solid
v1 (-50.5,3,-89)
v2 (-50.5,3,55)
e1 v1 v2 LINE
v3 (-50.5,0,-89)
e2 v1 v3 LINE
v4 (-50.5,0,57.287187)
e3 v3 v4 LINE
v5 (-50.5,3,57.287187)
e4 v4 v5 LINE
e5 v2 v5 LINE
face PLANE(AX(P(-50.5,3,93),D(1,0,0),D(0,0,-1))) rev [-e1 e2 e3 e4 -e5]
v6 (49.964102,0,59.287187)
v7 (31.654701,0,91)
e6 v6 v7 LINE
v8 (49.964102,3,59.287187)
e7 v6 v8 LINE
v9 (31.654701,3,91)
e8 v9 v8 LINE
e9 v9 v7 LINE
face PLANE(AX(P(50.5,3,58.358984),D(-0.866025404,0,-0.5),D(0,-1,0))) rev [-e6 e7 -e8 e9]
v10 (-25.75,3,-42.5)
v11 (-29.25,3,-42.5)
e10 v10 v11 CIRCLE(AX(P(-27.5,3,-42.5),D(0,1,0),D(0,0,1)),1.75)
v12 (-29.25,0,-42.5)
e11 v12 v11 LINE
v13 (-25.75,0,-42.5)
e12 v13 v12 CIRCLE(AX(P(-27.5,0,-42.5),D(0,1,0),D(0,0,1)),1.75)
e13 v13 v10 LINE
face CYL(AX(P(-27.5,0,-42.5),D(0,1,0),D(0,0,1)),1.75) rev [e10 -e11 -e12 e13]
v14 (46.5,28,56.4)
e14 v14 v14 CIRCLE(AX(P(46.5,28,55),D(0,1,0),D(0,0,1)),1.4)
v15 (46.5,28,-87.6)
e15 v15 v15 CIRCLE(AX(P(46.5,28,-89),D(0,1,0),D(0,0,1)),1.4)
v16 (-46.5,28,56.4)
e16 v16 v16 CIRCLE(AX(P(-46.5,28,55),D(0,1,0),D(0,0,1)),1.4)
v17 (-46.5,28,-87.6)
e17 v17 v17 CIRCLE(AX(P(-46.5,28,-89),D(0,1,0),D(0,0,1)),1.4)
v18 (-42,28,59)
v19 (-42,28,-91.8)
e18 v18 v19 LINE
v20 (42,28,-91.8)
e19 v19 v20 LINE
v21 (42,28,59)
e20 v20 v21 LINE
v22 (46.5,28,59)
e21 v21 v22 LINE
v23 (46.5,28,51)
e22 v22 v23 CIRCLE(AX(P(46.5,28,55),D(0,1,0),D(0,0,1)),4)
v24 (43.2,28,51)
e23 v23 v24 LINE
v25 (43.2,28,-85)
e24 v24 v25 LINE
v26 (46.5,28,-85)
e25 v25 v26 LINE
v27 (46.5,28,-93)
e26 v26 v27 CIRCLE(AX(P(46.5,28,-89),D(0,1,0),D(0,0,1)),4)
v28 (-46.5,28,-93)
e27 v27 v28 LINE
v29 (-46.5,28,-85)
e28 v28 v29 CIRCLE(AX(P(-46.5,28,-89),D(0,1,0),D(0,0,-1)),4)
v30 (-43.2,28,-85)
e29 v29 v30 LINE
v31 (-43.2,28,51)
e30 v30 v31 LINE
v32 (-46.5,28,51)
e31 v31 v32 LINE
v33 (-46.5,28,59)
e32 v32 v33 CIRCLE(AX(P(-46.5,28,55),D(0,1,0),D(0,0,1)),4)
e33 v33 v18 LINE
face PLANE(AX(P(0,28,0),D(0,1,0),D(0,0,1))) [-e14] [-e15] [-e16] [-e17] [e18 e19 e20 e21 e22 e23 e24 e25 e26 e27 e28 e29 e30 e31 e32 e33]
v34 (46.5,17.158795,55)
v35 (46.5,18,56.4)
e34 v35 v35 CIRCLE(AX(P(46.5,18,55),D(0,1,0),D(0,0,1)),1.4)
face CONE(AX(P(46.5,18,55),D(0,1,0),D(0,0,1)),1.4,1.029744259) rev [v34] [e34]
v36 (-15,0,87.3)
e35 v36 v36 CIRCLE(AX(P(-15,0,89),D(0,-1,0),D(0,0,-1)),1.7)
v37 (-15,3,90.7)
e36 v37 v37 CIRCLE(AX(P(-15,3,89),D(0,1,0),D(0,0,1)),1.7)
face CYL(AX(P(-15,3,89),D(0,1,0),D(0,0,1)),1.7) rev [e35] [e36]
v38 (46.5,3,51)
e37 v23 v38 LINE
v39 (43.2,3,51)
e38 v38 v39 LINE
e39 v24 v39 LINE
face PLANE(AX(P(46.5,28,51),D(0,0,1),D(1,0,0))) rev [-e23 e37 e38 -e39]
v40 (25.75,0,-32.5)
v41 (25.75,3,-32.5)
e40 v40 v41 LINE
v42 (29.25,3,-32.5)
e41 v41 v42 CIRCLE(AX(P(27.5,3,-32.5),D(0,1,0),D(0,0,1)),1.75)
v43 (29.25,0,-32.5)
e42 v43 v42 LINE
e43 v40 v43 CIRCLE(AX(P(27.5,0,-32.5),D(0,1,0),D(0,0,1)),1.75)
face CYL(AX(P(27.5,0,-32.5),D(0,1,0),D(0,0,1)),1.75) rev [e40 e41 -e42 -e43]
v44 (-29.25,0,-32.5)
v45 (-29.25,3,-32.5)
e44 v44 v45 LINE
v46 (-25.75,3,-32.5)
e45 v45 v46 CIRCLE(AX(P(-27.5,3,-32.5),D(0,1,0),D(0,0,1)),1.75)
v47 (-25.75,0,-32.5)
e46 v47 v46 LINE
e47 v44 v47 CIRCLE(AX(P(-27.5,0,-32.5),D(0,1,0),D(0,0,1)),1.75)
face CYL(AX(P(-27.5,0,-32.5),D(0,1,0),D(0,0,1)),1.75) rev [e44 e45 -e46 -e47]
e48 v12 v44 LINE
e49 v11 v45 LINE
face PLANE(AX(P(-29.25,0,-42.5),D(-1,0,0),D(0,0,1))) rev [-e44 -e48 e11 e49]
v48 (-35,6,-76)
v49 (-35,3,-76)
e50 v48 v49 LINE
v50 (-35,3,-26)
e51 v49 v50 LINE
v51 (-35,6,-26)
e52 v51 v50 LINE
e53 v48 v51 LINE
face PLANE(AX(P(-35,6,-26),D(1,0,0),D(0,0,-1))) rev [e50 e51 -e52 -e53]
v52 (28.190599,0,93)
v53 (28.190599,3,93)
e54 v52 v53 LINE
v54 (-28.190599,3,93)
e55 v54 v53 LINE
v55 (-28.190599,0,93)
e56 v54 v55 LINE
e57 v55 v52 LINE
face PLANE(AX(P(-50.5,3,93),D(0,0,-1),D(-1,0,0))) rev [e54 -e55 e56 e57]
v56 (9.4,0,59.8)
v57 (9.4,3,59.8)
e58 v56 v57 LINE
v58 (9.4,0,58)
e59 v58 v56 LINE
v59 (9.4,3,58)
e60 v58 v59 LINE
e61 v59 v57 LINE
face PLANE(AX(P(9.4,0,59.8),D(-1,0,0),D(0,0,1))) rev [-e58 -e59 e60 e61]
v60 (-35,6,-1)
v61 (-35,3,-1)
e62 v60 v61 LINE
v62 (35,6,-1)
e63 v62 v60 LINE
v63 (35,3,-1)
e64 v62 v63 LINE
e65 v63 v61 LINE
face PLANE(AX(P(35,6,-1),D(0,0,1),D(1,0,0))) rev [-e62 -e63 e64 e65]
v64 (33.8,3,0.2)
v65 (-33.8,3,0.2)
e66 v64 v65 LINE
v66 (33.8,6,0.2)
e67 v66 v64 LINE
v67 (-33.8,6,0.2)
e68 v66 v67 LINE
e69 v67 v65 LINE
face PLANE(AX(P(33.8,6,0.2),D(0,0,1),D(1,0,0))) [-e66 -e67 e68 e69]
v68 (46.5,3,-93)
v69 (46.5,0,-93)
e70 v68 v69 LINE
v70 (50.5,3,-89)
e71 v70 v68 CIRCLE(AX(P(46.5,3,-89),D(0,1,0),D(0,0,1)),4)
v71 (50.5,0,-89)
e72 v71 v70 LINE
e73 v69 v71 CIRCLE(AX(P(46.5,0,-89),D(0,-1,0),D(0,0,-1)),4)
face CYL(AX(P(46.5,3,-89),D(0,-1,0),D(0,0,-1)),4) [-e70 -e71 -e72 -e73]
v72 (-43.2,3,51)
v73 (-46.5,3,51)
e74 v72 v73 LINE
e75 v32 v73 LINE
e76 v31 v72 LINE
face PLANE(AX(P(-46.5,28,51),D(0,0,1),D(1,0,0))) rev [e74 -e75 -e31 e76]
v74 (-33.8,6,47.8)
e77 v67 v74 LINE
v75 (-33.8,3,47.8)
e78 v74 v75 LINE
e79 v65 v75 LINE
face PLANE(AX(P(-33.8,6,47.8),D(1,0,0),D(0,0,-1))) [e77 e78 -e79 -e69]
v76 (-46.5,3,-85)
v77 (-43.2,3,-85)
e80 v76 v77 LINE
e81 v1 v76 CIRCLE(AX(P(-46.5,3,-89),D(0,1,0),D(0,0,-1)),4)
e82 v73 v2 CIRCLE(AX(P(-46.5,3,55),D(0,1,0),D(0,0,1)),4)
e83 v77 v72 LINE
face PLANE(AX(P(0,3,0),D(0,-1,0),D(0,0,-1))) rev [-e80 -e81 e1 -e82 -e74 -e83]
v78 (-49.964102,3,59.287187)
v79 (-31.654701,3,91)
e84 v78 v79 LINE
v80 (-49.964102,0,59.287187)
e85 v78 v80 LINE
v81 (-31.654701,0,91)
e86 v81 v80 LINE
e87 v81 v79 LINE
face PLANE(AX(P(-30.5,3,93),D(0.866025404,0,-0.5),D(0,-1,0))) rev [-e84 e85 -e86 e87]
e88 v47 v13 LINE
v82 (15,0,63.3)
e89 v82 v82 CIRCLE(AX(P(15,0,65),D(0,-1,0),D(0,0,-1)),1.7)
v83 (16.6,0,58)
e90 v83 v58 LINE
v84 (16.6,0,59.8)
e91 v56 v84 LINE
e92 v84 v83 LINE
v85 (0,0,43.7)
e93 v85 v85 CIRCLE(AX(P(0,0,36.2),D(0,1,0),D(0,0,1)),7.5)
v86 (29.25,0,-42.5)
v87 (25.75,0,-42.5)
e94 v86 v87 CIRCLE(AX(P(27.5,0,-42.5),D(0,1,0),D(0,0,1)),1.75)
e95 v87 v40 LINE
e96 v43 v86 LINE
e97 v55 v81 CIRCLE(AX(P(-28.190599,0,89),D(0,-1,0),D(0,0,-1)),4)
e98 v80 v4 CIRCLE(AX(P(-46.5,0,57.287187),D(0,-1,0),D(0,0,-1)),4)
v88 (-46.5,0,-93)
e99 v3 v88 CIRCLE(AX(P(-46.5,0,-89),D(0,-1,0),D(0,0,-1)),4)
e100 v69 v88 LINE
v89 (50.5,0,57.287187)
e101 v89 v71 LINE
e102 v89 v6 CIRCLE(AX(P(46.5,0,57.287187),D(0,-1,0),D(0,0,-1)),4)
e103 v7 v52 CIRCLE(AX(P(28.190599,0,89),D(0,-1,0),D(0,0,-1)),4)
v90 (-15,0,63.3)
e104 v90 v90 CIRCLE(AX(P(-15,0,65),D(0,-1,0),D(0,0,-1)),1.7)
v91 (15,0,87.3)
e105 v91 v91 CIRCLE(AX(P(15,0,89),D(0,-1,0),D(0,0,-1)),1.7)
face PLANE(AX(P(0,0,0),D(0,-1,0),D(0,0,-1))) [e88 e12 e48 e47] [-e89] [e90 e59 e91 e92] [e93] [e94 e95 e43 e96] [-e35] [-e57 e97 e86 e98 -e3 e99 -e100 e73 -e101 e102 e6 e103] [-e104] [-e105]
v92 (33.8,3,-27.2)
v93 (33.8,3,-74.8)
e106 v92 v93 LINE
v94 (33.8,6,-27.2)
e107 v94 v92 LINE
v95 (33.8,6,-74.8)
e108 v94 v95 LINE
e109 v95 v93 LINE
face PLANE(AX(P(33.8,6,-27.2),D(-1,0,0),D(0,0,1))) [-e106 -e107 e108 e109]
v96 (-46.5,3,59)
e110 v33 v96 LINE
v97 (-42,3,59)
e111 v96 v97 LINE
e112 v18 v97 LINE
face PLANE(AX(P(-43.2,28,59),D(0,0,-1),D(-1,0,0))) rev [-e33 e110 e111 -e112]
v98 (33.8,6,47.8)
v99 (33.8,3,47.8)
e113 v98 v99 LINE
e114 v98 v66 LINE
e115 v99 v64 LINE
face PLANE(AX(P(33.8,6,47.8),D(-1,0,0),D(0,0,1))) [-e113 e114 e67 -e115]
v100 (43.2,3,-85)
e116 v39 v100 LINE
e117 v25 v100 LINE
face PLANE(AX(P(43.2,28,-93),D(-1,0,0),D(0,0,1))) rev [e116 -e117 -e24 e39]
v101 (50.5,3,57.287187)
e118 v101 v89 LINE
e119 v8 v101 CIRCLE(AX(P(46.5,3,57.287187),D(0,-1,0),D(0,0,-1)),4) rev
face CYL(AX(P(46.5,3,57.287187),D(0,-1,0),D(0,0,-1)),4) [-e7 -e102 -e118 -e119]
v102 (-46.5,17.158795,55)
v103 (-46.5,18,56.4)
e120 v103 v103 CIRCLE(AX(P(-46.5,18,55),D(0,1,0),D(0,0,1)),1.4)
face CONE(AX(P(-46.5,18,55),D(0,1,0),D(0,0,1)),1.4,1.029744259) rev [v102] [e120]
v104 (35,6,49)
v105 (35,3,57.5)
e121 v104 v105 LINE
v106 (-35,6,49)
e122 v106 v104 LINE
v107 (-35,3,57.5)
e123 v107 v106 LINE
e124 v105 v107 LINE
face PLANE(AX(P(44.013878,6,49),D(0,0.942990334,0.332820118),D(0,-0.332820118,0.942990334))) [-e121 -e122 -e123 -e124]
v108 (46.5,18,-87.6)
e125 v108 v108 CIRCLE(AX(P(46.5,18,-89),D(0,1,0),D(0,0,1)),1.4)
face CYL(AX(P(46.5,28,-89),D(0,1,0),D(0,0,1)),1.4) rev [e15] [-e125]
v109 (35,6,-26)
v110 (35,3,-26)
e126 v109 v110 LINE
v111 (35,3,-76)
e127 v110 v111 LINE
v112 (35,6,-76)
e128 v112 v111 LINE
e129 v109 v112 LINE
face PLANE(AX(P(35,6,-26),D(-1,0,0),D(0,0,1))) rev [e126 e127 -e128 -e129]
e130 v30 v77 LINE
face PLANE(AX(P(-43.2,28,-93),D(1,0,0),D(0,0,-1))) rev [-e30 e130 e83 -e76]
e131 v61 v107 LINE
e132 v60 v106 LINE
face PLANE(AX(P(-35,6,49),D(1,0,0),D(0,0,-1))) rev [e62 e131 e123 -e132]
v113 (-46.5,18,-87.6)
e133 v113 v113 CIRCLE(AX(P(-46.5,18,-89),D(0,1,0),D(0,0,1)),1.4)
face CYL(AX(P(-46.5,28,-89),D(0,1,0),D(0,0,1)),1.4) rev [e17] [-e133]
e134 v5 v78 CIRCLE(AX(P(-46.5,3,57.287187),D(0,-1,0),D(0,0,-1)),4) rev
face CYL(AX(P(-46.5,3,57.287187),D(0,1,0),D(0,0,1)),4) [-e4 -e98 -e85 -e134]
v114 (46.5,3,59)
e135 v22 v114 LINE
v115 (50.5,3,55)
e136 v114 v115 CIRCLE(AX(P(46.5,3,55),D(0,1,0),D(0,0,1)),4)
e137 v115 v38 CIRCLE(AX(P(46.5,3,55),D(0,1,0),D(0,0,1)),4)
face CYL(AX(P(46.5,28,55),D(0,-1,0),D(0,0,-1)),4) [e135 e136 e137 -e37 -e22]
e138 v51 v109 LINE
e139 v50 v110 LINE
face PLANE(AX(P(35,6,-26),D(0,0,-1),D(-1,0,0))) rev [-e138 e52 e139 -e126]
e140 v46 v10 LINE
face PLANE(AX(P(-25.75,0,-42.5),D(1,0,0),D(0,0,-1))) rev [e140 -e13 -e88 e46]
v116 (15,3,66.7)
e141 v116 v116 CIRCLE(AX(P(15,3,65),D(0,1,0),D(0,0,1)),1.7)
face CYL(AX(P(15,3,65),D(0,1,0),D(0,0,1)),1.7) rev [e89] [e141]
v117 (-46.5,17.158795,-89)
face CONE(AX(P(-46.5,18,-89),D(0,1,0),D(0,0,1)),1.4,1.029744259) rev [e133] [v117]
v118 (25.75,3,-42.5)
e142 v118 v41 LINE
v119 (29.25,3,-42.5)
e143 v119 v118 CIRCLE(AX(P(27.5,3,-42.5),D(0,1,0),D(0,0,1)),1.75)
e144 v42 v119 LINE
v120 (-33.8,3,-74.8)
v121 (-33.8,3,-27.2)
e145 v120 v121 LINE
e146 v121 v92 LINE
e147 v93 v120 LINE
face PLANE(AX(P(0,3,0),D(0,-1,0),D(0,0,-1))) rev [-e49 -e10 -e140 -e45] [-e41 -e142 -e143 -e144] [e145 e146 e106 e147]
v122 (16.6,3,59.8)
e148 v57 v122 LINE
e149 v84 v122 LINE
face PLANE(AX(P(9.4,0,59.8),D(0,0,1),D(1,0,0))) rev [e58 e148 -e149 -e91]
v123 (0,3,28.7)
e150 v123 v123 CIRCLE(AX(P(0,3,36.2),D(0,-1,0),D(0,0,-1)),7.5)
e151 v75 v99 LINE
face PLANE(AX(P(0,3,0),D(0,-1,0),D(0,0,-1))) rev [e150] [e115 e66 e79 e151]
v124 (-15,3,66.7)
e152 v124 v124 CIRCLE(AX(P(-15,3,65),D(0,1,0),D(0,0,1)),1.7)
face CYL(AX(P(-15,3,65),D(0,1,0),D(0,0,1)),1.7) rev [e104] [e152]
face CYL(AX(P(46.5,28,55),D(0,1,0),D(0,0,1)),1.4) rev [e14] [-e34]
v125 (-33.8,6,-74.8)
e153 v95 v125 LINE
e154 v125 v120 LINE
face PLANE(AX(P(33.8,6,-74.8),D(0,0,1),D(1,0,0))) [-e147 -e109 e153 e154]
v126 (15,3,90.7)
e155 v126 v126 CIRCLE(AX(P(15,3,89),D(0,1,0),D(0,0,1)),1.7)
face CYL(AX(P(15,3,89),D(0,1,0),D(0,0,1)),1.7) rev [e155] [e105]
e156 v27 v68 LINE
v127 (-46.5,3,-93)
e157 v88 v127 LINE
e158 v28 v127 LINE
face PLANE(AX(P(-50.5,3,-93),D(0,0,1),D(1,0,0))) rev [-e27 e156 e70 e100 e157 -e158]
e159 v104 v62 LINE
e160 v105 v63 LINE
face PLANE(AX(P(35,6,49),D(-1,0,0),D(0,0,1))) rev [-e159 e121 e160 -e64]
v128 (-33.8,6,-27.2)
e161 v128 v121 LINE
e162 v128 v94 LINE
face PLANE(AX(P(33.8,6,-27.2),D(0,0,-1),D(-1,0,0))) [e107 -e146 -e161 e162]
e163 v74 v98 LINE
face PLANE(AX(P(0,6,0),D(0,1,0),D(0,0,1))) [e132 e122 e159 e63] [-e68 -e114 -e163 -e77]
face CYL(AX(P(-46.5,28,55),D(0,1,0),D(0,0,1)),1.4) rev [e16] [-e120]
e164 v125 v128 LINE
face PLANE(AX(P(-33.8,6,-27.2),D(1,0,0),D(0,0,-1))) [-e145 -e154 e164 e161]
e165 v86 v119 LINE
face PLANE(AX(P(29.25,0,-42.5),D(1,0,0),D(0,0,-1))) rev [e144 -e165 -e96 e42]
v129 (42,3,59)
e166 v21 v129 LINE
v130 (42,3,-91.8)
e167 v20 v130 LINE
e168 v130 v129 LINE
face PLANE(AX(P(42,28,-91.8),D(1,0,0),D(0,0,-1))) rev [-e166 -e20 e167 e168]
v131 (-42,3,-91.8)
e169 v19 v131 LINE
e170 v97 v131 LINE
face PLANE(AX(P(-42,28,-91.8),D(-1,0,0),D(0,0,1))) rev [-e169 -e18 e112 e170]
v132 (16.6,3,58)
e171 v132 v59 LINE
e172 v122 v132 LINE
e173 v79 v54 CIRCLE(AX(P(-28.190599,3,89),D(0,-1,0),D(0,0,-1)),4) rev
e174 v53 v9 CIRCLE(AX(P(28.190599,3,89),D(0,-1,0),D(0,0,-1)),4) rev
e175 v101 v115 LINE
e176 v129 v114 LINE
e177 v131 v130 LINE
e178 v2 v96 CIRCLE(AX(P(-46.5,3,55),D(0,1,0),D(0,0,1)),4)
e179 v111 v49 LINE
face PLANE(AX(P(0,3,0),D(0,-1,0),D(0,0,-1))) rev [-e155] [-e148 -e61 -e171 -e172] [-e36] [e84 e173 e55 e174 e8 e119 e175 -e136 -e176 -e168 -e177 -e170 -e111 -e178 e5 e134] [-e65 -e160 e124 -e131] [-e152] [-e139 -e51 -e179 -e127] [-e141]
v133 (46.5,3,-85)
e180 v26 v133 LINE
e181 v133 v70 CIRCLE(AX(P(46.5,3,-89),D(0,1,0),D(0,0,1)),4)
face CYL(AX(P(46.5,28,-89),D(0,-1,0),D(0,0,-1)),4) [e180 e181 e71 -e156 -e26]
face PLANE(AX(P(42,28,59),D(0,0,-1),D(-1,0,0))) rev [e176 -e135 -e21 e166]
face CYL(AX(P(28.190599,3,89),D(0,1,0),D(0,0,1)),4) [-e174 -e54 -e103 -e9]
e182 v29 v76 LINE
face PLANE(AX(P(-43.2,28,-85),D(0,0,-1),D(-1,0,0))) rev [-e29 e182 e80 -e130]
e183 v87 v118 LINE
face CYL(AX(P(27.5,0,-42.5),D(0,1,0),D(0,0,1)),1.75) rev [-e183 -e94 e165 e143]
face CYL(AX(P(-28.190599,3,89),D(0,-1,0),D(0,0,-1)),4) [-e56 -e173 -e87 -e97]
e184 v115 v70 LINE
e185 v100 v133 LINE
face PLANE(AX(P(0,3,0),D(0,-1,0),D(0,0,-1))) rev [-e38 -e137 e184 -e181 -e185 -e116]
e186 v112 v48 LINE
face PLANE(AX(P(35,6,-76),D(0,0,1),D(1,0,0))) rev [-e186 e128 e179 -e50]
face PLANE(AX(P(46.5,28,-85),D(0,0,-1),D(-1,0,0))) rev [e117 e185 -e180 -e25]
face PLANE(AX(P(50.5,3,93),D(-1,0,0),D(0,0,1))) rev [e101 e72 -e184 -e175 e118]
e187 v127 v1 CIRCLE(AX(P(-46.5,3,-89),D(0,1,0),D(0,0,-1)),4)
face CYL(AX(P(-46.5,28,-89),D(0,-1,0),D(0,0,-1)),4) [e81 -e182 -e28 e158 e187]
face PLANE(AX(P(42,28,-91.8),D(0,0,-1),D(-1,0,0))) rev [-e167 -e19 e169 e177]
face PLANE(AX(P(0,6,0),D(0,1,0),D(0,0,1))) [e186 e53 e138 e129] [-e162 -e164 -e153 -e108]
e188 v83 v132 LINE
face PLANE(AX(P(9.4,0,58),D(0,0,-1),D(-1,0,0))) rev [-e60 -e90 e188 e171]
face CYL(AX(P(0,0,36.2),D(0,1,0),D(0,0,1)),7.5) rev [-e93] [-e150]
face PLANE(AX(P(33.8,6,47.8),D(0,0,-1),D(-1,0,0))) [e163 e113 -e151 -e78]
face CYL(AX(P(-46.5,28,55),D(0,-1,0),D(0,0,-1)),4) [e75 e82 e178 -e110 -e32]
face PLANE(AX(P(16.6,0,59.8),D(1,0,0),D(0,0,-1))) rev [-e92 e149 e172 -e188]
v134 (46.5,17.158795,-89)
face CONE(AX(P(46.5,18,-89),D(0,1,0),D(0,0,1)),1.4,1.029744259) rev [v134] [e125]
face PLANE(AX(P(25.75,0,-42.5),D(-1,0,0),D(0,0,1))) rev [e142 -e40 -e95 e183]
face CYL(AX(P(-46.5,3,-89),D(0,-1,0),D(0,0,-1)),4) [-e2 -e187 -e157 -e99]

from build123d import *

# Parameters (mm, degrees)
SCHIZZO1_W                    = 101
SCHIZZO1_H                    = 186
ESTRUSIONE_ESTRUSIONE1_DEPTH  = 3
ESTRUSIONE_ESTRUSIONE3_DEPTH  = 25
SCHIZZO2_W                    = 70
SCHIZZO2_H                    = 50
SCHIZZO2_W_2                  = 67.6
SCHIZZO2_H_2                  = 47.6
ESTRUSIONE_ESTRUSIONE2_DEPTH  = 3
ESTRUSIONE_ESTRUSIONE5_DEPTH  = 70
TAGLIO_ESTRUSIONE2_DEPTH      = 109.739367296
TAGLIO_ESTRUSIONE2_DEPTH_BACK = 109.739367296
SCHIZZO9_R                    = 7.5
SCHIZZO4_W                    = 7.2
SCHIZZO4_H                    = 1.8
TAGLIO_ESTRUSIONE1_DEPTH      = 109.739367296
ESTRUSIONE_ESTRUSIONE4_DEPTH  = 25
FORO_2_8_2_8_1_D              = 2.8
FORO_2_8_2_8_1_DEPTH          = 10
FORO_2_8_2_8_1_TIP            = 0.841204867
SMUSSO1_SIZE                  = 20
SMUSSO1_SIZE2                 = 34.641016151
RACCORDO1_R                   = 4
TAGLIO_ESTRUSIONE3_DEPTH      = 109.739367296
FORO_PER_VITE_M3_1_D          = 3.4
FORO_PER_VITE_M3_1_DEPTH      = 10
FORO_PER_VITE_M3_1_TIP        = 1.021463052


with BuildPart() as part:
    # Schizzo1 → Estrusione-Estrusione1 (new body)
    with BuildSketch(Plane(origin=(0, 0, 0), x_dir=(1, 0, 0), z_dir=(0, 1, 0))):
        Rectangle(SCHIZZO1_W, SCHIZZO1_H)
    extrude(amount=ESTRUSIONE_ESTRUSIONE1_DEPTH)

    # Schizzo3 → Estrusione-Estrusione3 (add)
    with BuildSketch(Plane(origin=(0, 3, 0), x_dir=(1, 0, 0), z_dir=(0, 1, 0))):
        Polygon((-43.2, -59), (-42, -59), (-42, 91.8), (42, 91.8), (42, -59), (43.2, -59), (43.2, 93), (-43.2, 93), align=None)
    extrude(amount=ESTRUSIONE_ESTRUSIONE3_DEPTH)

    # Schizzo2 → Estrusione-Estrusione2 (add)
    # profile 1 of 2: a face of its own
    with BuildSketch(Plane(origin=(0, 3, 0), x_dir=(1, 0, 0), z_dir=(0, 1, 0))):
        with Locations((0, 51)):
            Rectangle(SCHIZZO2_W, SCHIZZO2_H)
        with Locations((0, 51)):
            Rectangle(SCHIZZO2_W_2, SCHIZZO2_H_2, mode=Mode.SUBTRACT)
    # profile 2 of 2: a face of its own
    with BuildSketch(Plane(origin=(0, 3, 0), x_dir=(1, 0, 0), z_dir=(0, 1, 0))):
        with Locations((0, -24)):
            Rectangle(SCHIZZO2_W, SCHIZZO2_H)
        with Locations((0, -24)):
            Rectangle(SCHIZZO2_W_2, SCHIZZO2_H_2, mode=Mode.SUBTRACT)
    extrude(amount=ESTRUSIONE_ESTRUSIONE2_DEPTH)

    # Schizzo13 → Estrusione-Estrusione5 (add)
    with BuildSketch(Plane.ZY.offset(35)):
        Polygon((49, 6), (57.5, 3), (49, 3), align=None)
    extrude(amount=-ESTRUSIONE_ESTRUSIONE5_DEPTH)

    # Schizzo9 → Taglio-Estrusione2 (cut, two sides: drawn at the far end of the back side and taken through both)
    with BuildSketch(Plane(origin=(0, 3, 0), x_dir=(1, 0, 0), z_dir=(0, 1, 0)).offset(-TAGLIO_ESTRUSIONE2_DEPTH_BACK)):
        with Locations(Location((0, -36.2, 0), (0, 0, 270))):
            Circle(SCHIZZO9_R)
    extrude(amount=TAGLIO_ESTRUSIONE2_DEPTH + TAGLIO_ESTRUSIONE2_DEPTH_BACK, mode=Mode.SUBTRACT)

    # Schizzo4 → Taglio-Estrusione1 (cut, through all)
    with BuildSketch(Plane(origin=(0, 3, 0), x_dir=(1, 0, 0), z_dir=(0, 1, 0))):
        with Locations((13, -58.9)):
            Rectangle(SCHIZZO4_W, SCHIZZO4_H)
    extrude(amount=-TAGLIO_ESTRUSIONE1_DEPTH, mode=Mode.SUBTRACT)

    # Schizzo5 → Estrusione-Estrusione4 (add)
    with BuildSketch(Plane(origin=(0, 3, 0), x_dir=(1, 0, 0), z_dir=(0, 1, 0))):
        with BuildLine():
            Line((-43.2, 93), (-43.2, 85))
            Line((-43.2, 85), (-46.5, 85))
            ThreePointArc((-46.5, 85), (-50.5, 89), (-46.5, 93))
            Line((-46.5, 93), (-43.2, 93))
        make_face()
        with BuildLine():
            Line((46.5, 85), (43.2, 85))
            Line((43.2, 85), (43.2, 93))
            Line((43.2, 93), (46.5, 93))
            ThreePointArc((46.5, 93), (50.5, 89), (46.5, 85))
        make_face()
        with BuildLine():
            Line((46.5, -51), (43.2, -51))
            Line((43.2, -51), (43.2, -59))
            Line((43.2, -59), (46.5, -59))
            ThreePointArc((46.5, -59), (50.5, -55), (46.5, -51))
        make_face()
        with BuildLine():
            Line((-46.5, -51), (-43.2, -51))
            Line((-43.2, -51), (-43.2, -59))
            Line((-43.2, -59), (-46.5, -59))
            ThreePointArc((-46.5, -59), (-50.5, -55), (-46.5, -51))
        make_face()
    extrude(amount=ESTRUSIONE_ESTRUSIONE4_DEPTH)

    # Foro Ø2.8 (2.8)-1
    with Locations(Plane(origin=(0, 28, 0), x_dir=(1, 0, 0), z_dir=(0, 1, 0))):
        with Locations((-46.5, 89), (46.5, 89), (46.5, -55), (-46.5, -55)):
            Hole(FORO_2_8_2_8_1_D / 2, depth=FORO_2_8_2_8_1_DEPTH)
            with Locations((0, 0, -(FORO_2_8_2_8_1_DEPTH + FORO_2_8_2_8_1_TIP / 2))):  # 118° drill point
                Cone(0, FORO_2_8_2_8_1_D / 2, FORO_2_8_2_8_1_TIP, mode=Mode.SUBTRACT)

    # Smusso1
    smusso1_edges = [part.edges().sort_by_distance(p)[0] for p in [
        (50.5, 1.5, 93),
        (-50.5, 1.5, 93),
    ]]
    smusso1_side = [part.faces().sort_by_distance(p)[0] for p in [
        (0, 1.5, 93),
    ]]
    chamfer(smusso1_edges, length=SMUSSO1_SIZE, length2=SMUSSO1_SIZE2, reference=smusso1_side[0])

    # Raccordo1
    raccordo1_edges = [part.edges().sort_by_distance(p)[0] for p in [
        (50.5, 1.5, 58.358983849),
        (-50.5, 1.5, 58.358983849),
        (30.5, 1.5, 93),
        (-30.5, 1.5, 93),
        (-50.5, 1.5, -93),
        (50.5, 1.5, -93),
    ]]
    fillet(raccordo1_edges, radius=RACCORDO1_R - 0.0001)  # a hair under: the kernel refuses the full size

    # Schizzo10 → Taglio-Estrusione3 (cut, through all)
    with BuildSketch(Plane(origin=(0, 3, 0), x_dir=(1, 0, 0), z_dir=(0, 1, 0))):
        with BuildLine():
            Line((29.25, 42.5), (29.25, 32.5))
            ThreePointArc((29.25, 32.5), (27.5, 30.75), (25.75, 32.5))
            Line((25.75, 32.5), (25.75, 42.5))
            ThreePointArc((25.75, 42.5), (27.5, 44.25), (29.25, 42.5))
        make_face()
        with BuildLine():
            Line((-25.75, 42.5), (-25.75, 32.5))
            ThreePointArc((-25.75, 32.5), (-27.5, 30.75), (-29.25, 32.5))
            Line((-29.25, 32.5), (-29.25, 42.5))
            ThreePointArc((-29.25, 42.5), (-27.5, 44.25), (-25.75, 42.5))
        make_face()
    extrude(amount=-TAGLIO_ESTRUSIONE3_DEPTH, mode=Mode.SUBTRACT)

    # Foro per Vite M3-1
    with Locations(Plane(origin=(0, 3, 0), x_dir=(1, 0, 0), z_dir=(0, 1, 0))):
        with Locations((15, -65), (15, -89), (-15, -89), (-15, -65)):
            Hole(FORO_PER_VITE_M3_1_D / 2, depth=FORO_PER_VITE_M3_1_DEPTH)
            with Locations((0, 0, -(FORO_PER_VITE_M3_1_DEPTH + FORO_PER_VITE_M3_1_TIP / 2))):  # 118° drill point
                Cone(0, FORO_PER_VITE_M3_1_D / 2, FORO_PER_VITE_M3_1_TIP, mode=Mode.SUBTRACT)


solid = part.part
